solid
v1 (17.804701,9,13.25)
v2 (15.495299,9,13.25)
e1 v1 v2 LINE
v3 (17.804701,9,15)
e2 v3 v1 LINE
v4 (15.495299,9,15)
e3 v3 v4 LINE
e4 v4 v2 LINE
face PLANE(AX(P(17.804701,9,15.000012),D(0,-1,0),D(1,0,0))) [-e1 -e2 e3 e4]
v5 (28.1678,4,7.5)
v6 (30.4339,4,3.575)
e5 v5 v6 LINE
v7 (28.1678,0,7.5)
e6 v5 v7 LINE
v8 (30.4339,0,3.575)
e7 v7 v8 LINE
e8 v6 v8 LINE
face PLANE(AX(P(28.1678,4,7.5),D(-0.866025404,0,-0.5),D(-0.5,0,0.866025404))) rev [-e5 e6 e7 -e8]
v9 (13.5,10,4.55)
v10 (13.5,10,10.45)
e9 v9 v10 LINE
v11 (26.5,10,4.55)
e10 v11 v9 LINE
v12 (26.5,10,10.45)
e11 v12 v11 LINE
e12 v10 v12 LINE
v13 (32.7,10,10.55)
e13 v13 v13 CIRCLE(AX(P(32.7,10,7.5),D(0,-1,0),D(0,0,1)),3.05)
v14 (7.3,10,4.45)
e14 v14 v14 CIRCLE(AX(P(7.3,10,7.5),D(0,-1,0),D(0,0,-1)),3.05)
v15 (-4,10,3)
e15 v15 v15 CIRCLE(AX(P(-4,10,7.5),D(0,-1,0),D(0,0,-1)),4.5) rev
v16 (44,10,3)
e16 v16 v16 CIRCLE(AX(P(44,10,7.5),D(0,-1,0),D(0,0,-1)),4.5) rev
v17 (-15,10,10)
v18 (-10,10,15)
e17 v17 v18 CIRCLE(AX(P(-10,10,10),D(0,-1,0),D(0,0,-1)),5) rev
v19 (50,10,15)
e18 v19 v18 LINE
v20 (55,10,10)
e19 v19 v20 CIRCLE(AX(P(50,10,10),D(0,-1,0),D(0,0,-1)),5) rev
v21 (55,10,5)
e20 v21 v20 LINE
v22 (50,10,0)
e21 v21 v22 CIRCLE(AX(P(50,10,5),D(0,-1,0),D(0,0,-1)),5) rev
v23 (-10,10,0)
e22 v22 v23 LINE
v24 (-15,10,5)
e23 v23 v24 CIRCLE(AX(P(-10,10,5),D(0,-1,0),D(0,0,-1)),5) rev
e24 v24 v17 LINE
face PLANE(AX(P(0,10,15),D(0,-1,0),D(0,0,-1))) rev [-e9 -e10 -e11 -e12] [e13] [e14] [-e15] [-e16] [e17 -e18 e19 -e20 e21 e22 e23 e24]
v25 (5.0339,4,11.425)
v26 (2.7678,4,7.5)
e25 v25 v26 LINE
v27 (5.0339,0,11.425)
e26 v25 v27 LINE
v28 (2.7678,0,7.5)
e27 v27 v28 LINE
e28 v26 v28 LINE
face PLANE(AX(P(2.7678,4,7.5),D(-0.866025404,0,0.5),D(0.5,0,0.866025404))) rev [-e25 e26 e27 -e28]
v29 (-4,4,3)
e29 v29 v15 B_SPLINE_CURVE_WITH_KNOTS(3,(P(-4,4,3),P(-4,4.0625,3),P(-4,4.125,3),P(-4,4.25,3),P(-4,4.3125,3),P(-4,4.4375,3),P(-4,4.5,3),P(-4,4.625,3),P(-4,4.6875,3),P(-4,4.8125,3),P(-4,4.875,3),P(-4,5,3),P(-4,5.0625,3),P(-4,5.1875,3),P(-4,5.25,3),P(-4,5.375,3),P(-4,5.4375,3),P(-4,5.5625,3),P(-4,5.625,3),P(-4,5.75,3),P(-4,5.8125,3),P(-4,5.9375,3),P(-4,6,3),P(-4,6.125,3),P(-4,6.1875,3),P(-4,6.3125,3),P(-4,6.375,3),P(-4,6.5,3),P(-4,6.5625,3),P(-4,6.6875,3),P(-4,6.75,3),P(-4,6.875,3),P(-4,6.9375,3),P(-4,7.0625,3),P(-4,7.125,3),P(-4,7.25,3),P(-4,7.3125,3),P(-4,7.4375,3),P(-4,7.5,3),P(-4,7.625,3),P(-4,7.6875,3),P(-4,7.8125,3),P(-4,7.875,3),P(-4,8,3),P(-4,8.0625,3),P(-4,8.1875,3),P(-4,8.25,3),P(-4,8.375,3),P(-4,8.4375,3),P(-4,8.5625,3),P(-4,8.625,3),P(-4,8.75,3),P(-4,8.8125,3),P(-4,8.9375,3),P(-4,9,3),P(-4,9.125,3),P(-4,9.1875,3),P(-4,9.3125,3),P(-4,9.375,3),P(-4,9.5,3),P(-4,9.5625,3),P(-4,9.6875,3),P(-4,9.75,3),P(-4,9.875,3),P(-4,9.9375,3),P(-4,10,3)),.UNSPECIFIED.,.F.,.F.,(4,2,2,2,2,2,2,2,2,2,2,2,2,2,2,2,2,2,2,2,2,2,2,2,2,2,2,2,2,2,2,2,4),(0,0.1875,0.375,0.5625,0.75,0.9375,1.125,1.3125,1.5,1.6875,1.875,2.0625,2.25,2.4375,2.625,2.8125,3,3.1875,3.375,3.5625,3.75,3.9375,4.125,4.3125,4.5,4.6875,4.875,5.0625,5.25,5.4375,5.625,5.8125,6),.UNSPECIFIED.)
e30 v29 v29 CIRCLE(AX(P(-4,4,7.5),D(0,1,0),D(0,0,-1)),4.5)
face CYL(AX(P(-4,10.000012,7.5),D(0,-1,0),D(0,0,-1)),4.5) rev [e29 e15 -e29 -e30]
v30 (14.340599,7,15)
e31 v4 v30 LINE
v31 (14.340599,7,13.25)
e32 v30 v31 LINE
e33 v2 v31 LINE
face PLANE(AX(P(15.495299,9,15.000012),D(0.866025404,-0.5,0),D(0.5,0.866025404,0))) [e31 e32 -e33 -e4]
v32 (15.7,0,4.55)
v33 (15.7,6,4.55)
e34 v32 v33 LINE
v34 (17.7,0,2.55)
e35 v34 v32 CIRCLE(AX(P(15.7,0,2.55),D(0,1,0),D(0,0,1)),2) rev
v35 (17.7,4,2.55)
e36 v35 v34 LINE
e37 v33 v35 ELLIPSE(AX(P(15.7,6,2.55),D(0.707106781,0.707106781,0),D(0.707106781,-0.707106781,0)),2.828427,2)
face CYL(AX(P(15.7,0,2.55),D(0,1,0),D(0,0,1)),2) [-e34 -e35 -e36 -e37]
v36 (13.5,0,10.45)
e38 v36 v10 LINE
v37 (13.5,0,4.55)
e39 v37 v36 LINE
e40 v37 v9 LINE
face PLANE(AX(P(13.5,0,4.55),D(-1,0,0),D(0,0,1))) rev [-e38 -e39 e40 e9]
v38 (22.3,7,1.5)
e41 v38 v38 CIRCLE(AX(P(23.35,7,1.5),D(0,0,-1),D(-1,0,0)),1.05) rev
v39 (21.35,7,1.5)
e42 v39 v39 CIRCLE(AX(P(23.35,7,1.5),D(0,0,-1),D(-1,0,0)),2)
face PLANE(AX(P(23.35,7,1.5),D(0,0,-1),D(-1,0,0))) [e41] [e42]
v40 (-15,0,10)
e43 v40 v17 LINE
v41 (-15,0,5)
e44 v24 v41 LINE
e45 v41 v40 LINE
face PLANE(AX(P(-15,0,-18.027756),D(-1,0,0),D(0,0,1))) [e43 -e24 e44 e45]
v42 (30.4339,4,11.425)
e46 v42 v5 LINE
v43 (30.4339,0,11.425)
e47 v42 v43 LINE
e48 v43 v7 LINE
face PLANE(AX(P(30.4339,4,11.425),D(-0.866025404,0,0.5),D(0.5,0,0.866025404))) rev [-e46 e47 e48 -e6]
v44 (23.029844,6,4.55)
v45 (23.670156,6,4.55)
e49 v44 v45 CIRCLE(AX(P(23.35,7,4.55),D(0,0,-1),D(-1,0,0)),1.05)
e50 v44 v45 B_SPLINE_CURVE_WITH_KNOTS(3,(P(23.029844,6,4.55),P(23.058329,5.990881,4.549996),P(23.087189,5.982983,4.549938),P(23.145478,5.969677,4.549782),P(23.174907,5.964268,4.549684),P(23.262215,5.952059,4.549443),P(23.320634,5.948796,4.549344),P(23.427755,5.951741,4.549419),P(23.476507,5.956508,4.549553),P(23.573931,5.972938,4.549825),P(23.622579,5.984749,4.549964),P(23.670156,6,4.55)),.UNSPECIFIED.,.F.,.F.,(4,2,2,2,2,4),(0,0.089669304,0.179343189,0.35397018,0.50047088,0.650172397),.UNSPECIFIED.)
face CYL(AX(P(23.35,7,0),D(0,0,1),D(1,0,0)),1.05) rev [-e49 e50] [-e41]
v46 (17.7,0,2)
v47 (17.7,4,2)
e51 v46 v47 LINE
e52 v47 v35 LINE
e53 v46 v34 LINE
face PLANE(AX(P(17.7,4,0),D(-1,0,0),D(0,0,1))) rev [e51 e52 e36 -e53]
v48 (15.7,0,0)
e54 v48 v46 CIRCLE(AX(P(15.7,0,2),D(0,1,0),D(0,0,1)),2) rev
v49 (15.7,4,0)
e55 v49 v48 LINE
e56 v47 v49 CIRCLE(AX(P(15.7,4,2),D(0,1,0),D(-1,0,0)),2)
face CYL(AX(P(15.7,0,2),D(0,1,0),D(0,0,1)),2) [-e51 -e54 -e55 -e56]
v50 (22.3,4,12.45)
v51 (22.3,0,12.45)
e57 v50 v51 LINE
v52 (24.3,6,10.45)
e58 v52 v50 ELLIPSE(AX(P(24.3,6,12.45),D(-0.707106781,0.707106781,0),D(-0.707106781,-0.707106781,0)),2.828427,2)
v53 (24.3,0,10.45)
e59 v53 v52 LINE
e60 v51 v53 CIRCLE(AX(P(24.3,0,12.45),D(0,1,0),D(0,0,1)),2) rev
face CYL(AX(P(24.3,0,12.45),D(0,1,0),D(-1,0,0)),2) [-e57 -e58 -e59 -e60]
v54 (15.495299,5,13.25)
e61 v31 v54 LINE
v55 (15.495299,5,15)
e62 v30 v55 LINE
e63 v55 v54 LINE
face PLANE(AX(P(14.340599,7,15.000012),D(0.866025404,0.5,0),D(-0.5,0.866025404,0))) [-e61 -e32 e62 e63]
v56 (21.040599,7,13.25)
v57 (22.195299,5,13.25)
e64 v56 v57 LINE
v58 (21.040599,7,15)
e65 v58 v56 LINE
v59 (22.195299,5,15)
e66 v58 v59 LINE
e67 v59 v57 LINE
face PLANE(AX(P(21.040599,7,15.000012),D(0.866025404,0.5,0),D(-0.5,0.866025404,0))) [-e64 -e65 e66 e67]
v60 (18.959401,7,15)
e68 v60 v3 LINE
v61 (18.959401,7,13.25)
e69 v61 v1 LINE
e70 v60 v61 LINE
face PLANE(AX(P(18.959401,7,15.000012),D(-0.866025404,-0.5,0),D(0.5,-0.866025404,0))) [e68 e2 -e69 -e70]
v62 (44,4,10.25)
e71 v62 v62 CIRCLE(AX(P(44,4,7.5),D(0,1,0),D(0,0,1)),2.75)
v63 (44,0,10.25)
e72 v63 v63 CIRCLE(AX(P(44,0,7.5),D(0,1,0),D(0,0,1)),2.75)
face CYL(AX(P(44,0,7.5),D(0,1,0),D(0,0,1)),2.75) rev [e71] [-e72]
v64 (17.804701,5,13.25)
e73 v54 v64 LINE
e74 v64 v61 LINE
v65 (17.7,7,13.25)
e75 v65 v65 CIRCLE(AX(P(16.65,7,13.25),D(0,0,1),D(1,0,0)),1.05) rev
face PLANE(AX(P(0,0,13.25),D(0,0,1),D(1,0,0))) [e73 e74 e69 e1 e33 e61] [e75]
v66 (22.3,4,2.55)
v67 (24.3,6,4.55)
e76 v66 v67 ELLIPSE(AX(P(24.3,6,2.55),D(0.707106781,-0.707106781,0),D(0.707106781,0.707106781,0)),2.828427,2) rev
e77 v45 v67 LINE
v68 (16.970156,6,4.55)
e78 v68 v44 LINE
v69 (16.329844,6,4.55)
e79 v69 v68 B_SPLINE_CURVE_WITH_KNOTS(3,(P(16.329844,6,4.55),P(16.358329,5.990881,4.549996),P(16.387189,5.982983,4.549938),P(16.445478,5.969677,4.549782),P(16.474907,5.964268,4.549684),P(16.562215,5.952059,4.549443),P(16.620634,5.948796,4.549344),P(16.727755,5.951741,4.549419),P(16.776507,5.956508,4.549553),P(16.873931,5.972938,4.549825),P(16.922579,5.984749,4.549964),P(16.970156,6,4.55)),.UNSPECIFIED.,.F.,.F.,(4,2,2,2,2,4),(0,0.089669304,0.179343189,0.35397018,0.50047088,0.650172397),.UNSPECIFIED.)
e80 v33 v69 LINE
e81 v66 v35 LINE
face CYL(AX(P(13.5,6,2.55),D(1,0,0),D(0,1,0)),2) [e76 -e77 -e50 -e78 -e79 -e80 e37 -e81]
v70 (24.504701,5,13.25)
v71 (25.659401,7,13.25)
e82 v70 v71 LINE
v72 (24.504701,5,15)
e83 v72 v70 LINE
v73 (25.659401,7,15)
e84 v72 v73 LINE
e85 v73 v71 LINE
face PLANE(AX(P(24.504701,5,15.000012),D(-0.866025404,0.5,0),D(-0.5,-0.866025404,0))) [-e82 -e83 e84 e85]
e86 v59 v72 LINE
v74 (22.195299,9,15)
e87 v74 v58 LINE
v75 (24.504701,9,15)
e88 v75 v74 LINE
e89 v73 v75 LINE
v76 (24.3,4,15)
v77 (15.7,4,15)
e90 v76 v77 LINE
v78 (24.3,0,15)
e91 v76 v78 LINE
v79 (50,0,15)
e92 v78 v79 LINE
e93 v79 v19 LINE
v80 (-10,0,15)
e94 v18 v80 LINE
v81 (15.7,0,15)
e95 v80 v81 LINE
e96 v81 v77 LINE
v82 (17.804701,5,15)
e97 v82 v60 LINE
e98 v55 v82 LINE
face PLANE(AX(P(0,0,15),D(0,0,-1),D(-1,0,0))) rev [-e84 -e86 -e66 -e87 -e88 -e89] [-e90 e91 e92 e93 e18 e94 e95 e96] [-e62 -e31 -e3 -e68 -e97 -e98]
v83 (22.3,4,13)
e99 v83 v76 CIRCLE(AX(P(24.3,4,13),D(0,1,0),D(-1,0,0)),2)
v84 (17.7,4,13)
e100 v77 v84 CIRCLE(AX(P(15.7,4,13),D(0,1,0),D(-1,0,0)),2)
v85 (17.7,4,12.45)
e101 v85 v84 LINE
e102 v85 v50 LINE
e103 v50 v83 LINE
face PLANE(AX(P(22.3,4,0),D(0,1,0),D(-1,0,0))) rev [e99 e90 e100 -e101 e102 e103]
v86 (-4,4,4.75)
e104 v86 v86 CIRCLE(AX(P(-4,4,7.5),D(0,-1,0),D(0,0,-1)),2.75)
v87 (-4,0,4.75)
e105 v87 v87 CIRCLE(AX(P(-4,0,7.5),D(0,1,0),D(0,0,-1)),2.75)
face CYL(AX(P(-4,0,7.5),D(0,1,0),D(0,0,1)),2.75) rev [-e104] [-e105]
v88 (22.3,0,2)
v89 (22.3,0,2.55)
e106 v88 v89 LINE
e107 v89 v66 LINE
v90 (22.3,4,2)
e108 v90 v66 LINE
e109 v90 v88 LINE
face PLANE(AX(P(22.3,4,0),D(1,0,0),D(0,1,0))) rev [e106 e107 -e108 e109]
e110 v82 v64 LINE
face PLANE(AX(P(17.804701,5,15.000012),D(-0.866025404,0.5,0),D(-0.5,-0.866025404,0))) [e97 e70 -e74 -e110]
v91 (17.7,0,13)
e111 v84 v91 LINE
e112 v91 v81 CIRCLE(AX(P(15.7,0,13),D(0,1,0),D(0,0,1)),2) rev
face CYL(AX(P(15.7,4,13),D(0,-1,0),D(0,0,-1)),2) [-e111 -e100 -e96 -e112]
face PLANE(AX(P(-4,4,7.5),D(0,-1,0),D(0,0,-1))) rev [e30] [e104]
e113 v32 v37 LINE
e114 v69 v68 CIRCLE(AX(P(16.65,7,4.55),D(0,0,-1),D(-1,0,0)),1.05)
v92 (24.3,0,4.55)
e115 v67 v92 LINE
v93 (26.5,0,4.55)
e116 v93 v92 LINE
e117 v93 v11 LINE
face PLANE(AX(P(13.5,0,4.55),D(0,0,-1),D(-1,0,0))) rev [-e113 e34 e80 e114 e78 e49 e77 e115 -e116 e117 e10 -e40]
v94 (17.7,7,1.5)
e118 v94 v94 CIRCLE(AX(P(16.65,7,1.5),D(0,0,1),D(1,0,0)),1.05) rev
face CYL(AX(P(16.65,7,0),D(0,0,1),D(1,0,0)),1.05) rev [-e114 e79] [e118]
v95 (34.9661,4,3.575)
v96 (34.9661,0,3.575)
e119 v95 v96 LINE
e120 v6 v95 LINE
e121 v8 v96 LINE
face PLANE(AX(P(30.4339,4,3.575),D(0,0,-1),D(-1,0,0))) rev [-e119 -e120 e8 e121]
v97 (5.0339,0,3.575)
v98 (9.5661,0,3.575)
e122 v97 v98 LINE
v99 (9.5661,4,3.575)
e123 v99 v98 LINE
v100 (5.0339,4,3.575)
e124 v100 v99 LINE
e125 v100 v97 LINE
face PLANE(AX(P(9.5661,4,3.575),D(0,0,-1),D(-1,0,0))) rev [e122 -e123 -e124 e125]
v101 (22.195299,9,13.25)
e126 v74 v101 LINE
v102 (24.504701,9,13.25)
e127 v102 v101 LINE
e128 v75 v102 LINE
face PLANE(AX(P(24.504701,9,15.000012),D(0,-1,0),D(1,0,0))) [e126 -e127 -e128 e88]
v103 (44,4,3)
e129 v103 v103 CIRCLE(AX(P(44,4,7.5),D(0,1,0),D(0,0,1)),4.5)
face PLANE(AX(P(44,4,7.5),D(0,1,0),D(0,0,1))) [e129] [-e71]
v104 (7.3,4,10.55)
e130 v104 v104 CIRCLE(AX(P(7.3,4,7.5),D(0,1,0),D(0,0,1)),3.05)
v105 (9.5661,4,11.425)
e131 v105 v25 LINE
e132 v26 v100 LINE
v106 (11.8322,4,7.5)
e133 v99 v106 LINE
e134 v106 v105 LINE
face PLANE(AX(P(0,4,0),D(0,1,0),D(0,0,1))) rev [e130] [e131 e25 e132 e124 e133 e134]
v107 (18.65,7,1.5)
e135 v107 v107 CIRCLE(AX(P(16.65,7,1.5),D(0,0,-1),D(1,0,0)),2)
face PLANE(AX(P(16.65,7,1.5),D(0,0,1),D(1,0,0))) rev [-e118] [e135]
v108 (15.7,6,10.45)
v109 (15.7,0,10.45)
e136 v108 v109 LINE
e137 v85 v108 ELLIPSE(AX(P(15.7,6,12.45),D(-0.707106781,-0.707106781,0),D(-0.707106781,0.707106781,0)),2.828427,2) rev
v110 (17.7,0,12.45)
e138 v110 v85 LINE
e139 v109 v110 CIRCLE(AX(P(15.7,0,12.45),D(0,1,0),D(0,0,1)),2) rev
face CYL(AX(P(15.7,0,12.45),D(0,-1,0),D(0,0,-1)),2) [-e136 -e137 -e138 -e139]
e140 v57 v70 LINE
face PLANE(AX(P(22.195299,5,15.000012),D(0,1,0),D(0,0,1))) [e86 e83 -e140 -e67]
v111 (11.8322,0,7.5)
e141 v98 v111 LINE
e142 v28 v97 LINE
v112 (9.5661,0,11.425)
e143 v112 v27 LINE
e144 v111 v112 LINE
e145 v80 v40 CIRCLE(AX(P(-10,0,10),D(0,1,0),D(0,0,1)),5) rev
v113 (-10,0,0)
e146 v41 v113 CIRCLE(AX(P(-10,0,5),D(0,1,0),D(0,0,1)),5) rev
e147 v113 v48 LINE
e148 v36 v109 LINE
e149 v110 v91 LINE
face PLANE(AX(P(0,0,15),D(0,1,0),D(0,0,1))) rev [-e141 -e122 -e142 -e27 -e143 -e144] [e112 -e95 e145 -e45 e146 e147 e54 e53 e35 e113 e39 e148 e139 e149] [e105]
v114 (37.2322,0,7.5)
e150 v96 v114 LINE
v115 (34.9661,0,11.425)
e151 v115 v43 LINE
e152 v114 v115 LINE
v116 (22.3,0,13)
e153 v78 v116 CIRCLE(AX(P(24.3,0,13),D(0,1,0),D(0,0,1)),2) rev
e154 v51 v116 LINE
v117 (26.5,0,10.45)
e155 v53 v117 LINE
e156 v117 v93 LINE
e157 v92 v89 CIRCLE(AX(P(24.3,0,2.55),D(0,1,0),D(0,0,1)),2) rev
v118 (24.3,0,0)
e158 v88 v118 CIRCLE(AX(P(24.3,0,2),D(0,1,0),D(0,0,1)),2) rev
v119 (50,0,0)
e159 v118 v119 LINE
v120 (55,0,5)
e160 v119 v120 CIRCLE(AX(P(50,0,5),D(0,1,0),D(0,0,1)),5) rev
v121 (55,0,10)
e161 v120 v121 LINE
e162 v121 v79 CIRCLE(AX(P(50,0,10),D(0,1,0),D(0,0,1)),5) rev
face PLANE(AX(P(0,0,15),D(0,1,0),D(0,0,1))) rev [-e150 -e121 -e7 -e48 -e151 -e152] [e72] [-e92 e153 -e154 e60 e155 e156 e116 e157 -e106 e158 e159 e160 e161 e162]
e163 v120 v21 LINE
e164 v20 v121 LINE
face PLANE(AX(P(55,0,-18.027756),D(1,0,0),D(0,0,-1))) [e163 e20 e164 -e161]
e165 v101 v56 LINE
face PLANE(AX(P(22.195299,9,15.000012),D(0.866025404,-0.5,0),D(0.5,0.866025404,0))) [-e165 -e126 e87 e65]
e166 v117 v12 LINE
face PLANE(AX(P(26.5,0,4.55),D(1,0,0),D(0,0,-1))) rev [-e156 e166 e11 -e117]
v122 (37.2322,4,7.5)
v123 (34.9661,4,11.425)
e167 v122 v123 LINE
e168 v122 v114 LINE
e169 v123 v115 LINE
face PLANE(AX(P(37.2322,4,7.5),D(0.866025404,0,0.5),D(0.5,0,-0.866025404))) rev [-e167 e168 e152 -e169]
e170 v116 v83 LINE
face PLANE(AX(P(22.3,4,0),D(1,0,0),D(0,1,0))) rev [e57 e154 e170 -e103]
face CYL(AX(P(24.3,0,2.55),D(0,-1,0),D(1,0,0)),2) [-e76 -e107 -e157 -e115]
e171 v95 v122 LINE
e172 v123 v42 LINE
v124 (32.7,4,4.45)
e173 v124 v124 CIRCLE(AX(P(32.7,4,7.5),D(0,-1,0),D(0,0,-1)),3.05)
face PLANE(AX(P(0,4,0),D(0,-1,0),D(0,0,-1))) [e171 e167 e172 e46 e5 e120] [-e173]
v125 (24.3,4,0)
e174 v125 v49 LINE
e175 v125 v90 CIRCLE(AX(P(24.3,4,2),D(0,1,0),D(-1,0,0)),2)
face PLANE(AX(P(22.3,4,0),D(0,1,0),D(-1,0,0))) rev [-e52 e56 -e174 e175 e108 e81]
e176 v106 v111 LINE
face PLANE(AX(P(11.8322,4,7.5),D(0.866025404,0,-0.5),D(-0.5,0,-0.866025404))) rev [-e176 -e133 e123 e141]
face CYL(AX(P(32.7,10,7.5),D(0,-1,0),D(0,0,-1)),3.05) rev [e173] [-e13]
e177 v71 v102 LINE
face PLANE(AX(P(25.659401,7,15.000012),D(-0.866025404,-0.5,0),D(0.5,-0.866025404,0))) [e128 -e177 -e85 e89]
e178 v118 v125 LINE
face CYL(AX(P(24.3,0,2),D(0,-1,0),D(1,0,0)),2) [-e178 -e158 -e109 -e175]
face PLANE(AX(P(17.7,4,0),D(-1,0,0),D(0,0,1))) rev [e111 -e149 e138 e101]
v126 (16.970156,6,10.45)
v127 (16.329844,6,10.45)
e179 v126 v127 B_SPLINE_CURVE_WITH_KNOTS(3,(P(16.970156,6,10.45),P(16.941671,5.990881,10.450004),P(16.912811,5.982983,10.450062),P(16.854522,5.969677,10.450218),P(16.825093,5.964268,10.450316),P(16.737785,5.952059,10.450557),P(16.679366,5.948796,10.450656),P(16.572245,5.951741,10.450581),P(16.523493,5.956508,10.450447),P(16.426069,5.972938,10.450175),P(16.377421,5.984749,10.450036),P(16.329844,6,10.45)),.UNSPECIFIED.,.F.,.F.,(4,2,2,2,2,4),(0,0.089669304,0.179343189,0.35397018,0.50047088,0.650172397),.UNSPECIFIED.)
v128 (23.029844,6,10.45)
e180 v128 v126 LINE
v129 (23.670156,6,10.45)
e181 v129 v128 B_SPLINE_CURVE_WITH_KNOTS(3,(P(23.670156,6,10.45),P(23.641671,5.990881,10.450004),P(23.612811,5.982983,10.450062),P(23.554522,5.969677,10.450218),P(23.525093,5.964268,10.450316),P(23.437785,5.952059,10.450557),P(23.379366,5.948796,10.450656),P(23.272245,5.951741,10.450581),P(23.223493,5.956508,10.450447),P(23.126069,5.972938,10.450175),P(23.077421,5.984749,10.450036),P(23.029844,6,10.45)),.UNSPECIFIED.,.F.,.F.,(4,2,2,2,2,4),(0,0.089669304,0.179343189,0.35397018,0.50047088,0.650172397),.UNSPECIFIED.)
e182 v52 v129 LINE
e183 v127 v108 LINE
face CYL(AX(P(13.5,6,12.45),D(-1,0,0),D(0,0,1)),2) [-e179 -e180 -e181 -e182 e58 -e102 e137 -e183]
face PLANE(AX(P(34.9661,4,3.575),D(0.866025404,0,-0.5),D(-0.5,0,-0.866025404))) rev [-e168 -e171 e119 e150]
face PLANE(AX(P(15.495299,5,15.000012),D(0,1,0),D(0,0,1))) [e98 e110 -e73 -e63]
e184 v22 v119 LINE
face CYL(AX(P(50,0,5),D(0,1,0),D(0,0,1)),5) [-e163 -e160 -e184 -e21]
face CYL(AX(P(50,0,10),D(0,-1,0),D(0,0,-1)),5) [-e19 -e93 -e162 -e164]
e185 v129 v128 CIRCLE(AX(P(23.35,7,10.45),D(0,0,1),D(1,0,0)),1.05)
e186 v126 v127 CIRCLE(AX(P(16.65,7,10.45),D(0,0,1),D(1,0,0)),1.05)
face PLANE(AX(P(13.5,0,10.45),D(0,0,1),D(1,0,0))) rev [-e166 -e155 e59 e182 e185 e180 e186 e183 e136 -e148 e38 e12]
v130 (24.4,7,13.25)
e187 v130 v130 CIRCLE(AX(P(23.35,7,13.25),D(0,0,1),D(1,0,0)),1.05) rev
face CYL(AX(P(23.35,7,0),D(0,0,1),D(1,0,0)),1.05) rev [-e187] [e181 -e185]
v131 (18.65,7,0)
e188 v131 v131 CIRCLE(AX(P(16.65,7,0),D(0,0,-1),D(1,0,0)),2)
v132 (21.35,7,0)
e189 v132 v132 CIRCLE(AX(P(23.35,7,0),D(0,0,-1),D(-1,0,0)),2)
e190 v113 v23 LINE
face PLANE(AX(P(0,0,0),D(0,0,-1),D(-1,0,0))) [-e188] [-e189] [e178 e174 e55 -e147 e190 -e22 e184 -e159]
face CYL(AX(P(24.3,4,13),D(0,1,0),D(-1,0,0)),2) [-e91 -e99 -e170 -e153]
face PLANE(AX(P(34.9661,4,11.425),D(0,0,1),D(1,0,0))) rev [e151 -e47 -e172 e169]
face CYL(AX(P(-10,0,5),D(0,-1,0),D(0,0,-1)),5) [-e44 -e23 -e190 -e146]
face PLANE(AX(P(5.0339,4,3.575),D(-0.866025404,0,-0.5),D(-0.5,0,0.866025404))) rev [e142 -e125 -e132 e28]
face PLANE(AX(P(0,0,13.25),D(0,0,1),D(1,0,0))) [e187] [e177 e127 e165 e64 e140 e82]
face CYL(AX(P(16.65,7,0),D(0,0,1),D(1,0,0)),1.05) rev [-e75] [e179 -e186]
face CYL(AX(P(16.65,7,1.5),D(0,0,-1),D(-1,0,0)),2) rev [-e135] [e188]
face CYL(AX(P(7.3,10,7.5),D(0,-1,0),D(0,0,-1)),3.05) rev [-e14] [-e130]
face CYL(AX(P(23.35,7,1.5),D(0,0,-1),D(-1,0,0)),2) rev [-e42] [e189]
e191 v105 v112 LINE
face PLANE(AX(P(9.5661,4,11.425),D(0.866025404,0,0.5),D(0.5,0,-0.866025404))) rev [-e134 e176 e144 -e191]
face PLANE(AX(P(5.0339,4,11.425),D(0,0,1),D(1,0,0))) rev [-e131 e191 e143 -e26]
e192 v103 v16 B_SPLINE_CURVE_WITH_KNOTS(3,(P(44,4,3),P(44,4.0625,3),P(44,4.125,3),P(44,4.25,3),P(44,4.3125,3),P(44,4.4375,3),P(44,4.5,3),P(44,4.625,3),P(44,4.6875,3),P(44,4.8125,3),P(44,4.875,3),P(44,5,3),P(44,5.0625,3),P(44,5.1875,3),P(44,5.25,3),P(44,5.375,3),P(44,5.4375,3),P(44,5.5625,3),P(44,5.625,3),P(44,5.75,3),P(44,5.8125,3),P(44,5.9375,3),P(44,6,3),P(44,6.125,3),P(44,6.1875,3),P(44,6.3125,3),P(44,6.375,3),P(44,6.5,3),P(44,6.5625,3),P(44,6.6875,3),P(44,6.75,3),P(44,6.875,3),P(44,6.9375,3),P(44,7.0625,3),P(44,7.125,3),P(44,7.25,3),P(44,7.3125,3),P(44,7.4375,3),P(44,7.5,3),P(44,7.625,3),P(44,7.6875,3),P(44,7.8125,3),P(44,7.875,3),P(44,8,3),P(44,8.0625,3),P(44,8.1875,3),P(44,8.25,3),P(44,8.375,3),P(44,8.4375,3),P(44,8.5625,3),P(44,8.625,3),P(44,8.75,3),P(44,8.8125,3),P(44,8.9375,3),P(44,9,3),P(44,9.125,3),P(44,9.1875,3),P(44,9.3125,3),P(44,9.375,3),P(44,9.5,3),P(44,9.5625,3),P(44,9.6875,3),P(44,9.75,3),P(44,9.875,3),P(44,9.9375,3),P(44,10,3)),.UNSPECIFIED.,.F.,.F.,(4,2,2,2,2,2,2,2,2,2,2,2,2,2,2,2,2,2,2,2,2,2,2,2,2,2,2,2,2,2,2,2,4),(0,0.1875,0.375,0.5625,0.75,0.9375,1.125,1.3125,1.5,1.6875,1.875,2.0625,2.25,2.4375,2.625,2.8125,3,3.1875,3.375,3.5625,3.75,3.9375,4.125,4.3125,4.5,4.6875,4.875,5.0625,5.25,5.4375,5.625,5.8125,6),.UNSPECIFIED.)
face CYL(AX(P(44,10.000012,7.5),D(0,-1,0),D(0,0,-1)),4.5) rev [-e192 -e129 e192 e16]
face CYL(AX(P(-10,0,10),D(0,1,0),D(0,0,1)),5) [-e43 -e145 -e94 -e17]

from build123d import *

# Parameters (mm, degrees)
SKETCH1_W                = 40
SKETCH1_H                = 10
SWITCHCASE_DEPTH         = 15
SKETCH2_W                = 13
SKETCH2_H                = 5.9
SWITCHCAVITY_DEPTH       = 44.874821937
SWITCHM2HOLES_DEPTH      = 43.534721111
SWITCHM2HOLES_DEPTH_BACK = 43.534721111
SKETCH3_R                = 1.05
SKETCH14_R               = 2
M2HEAD_DEPTH             = 1.5
M2NUTINSERTS_DEPTH       = 44.874821937
M2NUTINSERTS_DEPTH_BACK  = 1.75
SKETCH7_W                = 15
SKETCH7_H                = 10
WINGS_DEPTH              = 15
M5NUTS_DEPTH             = 4
SKETCH10_R               = 3.05
M6HOLE_DEPTH             = 58.879184514
WIRECHANNEL_DEPTH        = 57.870049235
WIRECHANNEL_DEPTH_BACK   = 57.870049235
SKETCH11_W               = 4.6
SKETCH11_H               = 4
CHANNELFILLET_R          = 2
M5HEAD_DEPTH             = 58.879184514
M5HEAD_DEPTH_BACK        = 6
SKETCH12_R               = 4.5
SKETCH13_R               = 2.75
M5THREAD_DEPTH           = 58.879184514
ENDFILLET_R              = 5


with BuildPart() as part:
    # Sketch1 → SwitchCase (new body)
    with BuildSketch(Plane.XY):
        with Locations((20, 5)):
            Rectangle(SKETCH1_W, SKETCH1_H)
    extrude(amount=SWITCHCASE_DEPTH)

    # Sketch2 → SwitchCavity (cut, through all)
    with BuildSketch(Plane(origin=(0, 10, 0), x_dir=(1, 0, 0), z_dir=(0, 1, 0))):
        with Locations((20, -7.5)):
            Rectangle(SKETCH2_W, SKETCH2_H)
    extrude(amount=-SWITCHCAVITY_DEPTH, mode=Mode.SUBTRACT)

    # Sketch3 → SwitchM2Holes (cut, two sides: drawn at the far end of the back side and taken through both)
    with BuildSketch(Plane.XY.offset(4.55).offset(-SWITCHM2HOLES_DEPTH_BACK)):
        with Locations((16.65, 7)):
            Circle(SKETCH3_R)
        with Locations((23.35, 7)):
            Circle(SKETCH3_R)
    extrude(amount=SWITCHM2HOLES_DEPTH + SWITCHM2HOLES_DEPTH_BACK, mode=Mode.SUBTRACT)

    # Sketch14 → M2Head (cut)
    with BuildSketch(Plane(origin=(0, 0, 0), x_dir=(-1, 0, 0), z_dir=(0, 0, -1))):
        with Locations((-23.35, 7)):
            Circle(SKETCH14_R)
        with Locations(Location((-16.65, 7, 0), (0, 0, 180))):
            Circle(SKETCH14_R)
    extrude(amount=-M2HEAD_DEPTH, mode=Mode.SUBTRACT)

    # Sketch5 → M2NutInserts (cut, two sides: drawn at the far end of the back side and taken through both)
    with BuildSketch(Plane.XY.offset(15).offset(-M2NUTINSERTS_DEPTH_BACK)):
        Polygon((18.959401077, 7), (17.804700538, 9), (15.495299462, 9), (14.340598923, 7), (15.495299462, 5), (17.804700538, 5), align=None)
        Polygon((25.659401077, 7), (24.504700538, 9), (22.195299462, 9), (21.040598923, 7), (22.195299462, 5), (24.504700538, 5), align=None)
    extrude(amount=M2NUTINSERTS_DEPTH + M2NUTINSERTS_DEPTH_BACK, mode=Mode.SUBTRACT)

    # Sketch7 → Wings (add)
    with BuildSketch(Plane.XY.offset(15)):
        with Locations((-7.5, 5)):
            Rectangle(SKETCH7_W, SKETCH7_H)
        with Locations((47.5, 5)):
            Rectangle(SKETCH7_W, SKETCH7_H)
    extrude(amount=-WINGS_DEPTH)

    # Sketch9 → M5Nuts (cut)
    with BuildSketch(Plane.XZ):
        Polygon((37.232199613, 7.5), (34.966099807, 11.425), (30.433900193, 11.425), (28.167800387, 7.5), (30.433900193, 3.575), (34.966099807, 3.575), align=None)
        Polygon((5.033900193, 3.575), (2.767800387, 7.5), (5.033900193, 11.425), (9.566099807, 11.425), (11.832199613, 7.5), (9.566099807, 3.575), align=None)
    extrude(amount=-M5NUTS_DEPTH, mode=Mode.SUBTRACT)

    # Sketch10 → M6Hole (cut, through all)
    with BuildSketch(Plane.XZ):
        with Locations(Location((7.3, 7.5, 0), (0, 0, 270))):
            Circle(SKETCH10_R)
        with Locations(Location((32.7, 7.5, 0), (0, 0, 270))):
            Circle(SKETCH10_R)
    extrude(amount=-M6HOLE_DEPTH, mode=Mode.SUBTRACT)

    # Sketch11 → WireChannel (cut, two sides: drawn at the far end of the back side and taken through both)
    with BuildSketch(Plane.XY.offset(4.55).offset(-WIRECHANNEL_DEPTH_BACK)):
        with Locations((20, 2)):
            Rectangle(SKETCH11_W, SKETCH11_H)
    extrude(amount=WIRECHANNEL_DEPTH + WIRECHANNEL_DEPTH_BACK, mode=Mode.SUBTRACT)

    # ChannelFillet
    # the kernel refuses this fillet: 2 mm, written as the material it takes off along each edge
    with BuildSketch(Plane(origin=(22.3, 4, 10.45), x_dir=(0, 1, 0), z_dir=(-1, 0, 0)), Plane(origin=(17.7, 4, 4.55), x_dir=(0, 1, 0), z_dir=(1, 0, 0))) as channelfillet_piece_1:
        with BuildLine():
            CenterArc((CHANNELFILLET_R, -CHANNELFILLET_R), CHANNELFILLET_R, 90, 90)
            Line((0, -CHANNELFILLET_R), (-CHANNELFILLET_R * 0.02, -CHANNELFILLET_R))
            Line((-CHANNELFILLET_R * 0.02, -CHANNELFILLET_R), (-CHANNELFILLET_R * 0.02, CHANNELFILLET_R * 0.02))
            Line((-CHANNELFILLET_R * 0.02, CHANNELFILLET_R * 0.02), (CHANNELFILLET_R, CHANNELFILLET_R * 0.02))
            Line((CHANNELFILLET_R, CHANNELFILLET_R * 0.02), (CHANNELFILLET_R, 0))
        make_face()
    extrude(amount=4.6, mode=Mode.SUBTRACT)
    with BuildSketch(Plane(origin=(17.7, 4, 10.45), x_dir=(-1, 0, 0), z_dir=(0, -1, 0)), Plane(origin=(22.3, 0, 10.45), x_dir=(1, 0, 0), z_dir=(0, 1, 0)), Plane(origin=(22.3, 4, 4.55), x_dir=(1, 0, 0), z_dir=(0, -1, 0)), Plane(origin=(22.3, 4, 15), x_dir=(1, 0, 0), z_dir=(0, -1, 0))) as channelfillet_piece_2:
        with BuildLine():
            CenterArc((CHANNELFILLET_R, -CHANNELFILLET_R), CHANNELFILLET_R, 90, 90)
            Line((0, -CHANNELFILLET_R), (-CHANNELFILLET_R * 0.02, -CHANNELFILLET_R))
            Line((-CHANNELFILLET_R * 0.02, -CHANNELFILLET_R), (-CHANNELFILLET_R * 0.02, CHANNELFILLET_R * 0.02))
            Line((-CHANNELFILLET_R * 0.02, CHANNELFILLET_R * 0.02), (CHANNELFILLET_R, CHANNELFILLET_R * 0.02))
            Line((CHANNELFILLET_R, CHANNELFILLET_R * 0.02), (CHANNELFILLET_R, 0))
        make_face()
    extrude(amount=4, mode=Mode.SUBTRACT)
    with BuildSketch(Plane(origin=(22.3, 4, 0), x_dir=(1, 0, 0), z_dir=(0, -1, 0)), Plane(origin=(17.7, 0, 4.55), x_dir=(0, 0, -1), z_dir=(0, 1, 0)), Plane(origin=(17.7, 0, 0), x_dir=(-1, 0, 0), z_dir=(0, 1, 0)), Plane(origin=(17.7, 0, 15), x_dir=(0, 0, -1), z_dir=(0, 1, 0))) as channelfillet_piece_3:
        with BuildLine():
            CenterArc((CHANNELFILLET_R, CHANNELFILLET_R), CHANNELFILLET_R, 180, 90)
            Line((0, CHANNELFILLET_R), (-CHANNELFILLET_R * 0.02, CHANNELFILLET_R))
            Line((-CHANNELFILLET_R * 0.02, CHANNELFILLET_R), (-CHANNELFILLET_R * 0.02, -CHANNELFILLET_R * 0.02))
            Line((-CHANNELFILLET_R * 0.02, -CHANNELFILLET_R * 0.02), (CHANNELFILLET_R, -CHANNELFILLET_R * 0.02))
            Line((CHANNELFILLET_R, -CHANNELFILLET_R * 0.02), (CHANNELFILLET_R, 0))
        make_face()
    extrude(amount=4, mode=Mode.SUBTRACT)
    with BuildSketch(Plane(origin=(27.3, 4, 10.45), x_dir=(0, 1, 0), z_dir=(-1, 0, 0))) as channelfillet_piece_4a_section:
        with BuildLine():
            CenterArc((CHANNELFILLET_R, -CHANNELFILLET_R), CHANNELFILLET_R, 90, 90)
            Line((0, -CHANNELFILLET_R), (-CHANNELFILLET_R * 0.02, -CHANNELFILLET_R))
            Line((-CHANNELFILLET_R * 0.02, -CHANNELFILLET_R), (-CHANNELFILLET_R * 0.02, CHANNELFILLET_R * 0.02))
            Line((-CHANNELFILLET_R * 0.02, CHANNELFILLET_R * 0.02), (CHANNELFILLET_R, CHANNELFILLET_R * 0.02))
            Line((CHANNELFILLET_R, CHANNELFILLET_R * 0.02), (CHANNELFILLET_R, 0))
        make_face()
    channelfillet_piece_4a = extrude(amount=9.6, mode=Mode.PRIVATE)
    channelfillet_piece_4a = split(channelfillet_piece_4a, bisect_by=Plane(origin=(22.3, 4.452790229, 10.902790229), z_dir=(1, 0, 0)), keep=Keep.TOP, mode=Mode.PRIVATE)
    with BuildSketch(Plane(origin=(22.3, 0, 10.45), x_dir=(1, 0, 0), z_dir=(0, 1, 0))) as channelfillet_piece_4b_section:
        with BuildLine():
            CenterArc((CHANNELFILLET_R, -CHANNELFILLET_R), CHANNELFILLET_R, 90, 90)
            Line((0, -CHANNELFILLET_R), (-CHANNELFILLET_R * 0.02, -CHANNELFILLET_R))
            Line((-CHANNELFILLET_R * 0.02, -CHANNELFILLET_R), (-CHANNELFILLET_R * 0.02, CHANNELFILLET_R * 0.02))
            Line((-CHANNELFILLET_R * 0.02, CHANNELFILLET_R * 0.02), (CHANNELFILLET_R, CHANNELFILLET_R * 0.02))
            Line((CHANNELFILLET_R, CHANNELFILLET_R * 0.02), (CHANNELFILLET_R, 0))
        make_face()
    channelfillet_piece_4b = extrude(amount=9, mode=Mode.PRIVATE)
    channelfillet_piece_4b = split(channelfillet_piece_4b, bisect_by=Plane(origin=(22.752790229, 4, 10.902790229), z_dir=(0, 1, 0)), keep=Keep.TOP, mode=Mode.PRIVATE)
    channelfillet_piece_4 = channelfillet_piece_4a & channelfillet_piece_4b
    add(channelfillet_piece_4, mode=Mode.SUBTRACT)
    with BuildSketch(Plane(origin=(17.7, 9, 10.45), x_dir=(-1, 0, 0), z_dir=(0, -1, 0))) as channelfillet_piece_5a_section:
        with BuildLine():
            CenterArc((CHANNELFILLET_R, -CHANNELFILLET_R), CHANNELFILLET_R, 90, 90)
            Line((0, -CHANNELFILLET_R), (-CHANNELFILLET_R * 0.02, -CHANNELFILLET_R))
            Line((-CHANNELFILLET_R * 0.02, -CHANNELFILLET_R), (-CHANNELFILLET_R * 0.02, CHANNELFILLET_R * 0.02))
            Line((-CHANNELFILLET_R * 0.02, CHANNELFILLET_R * 0.02), (CHANNELFILLET_R, CHANNELFILLET_R * 0.02))
            Line((CHANNELFILLET_R, CHANNELFILLET_R * 0.02), (CHANNELFILLET_R, 0))
        make_face()
    channelfillet_piece_5a = extrude(amount=9, mode=Mode.PRIVATE)
    channelfillet_piece_5a = split(channelfillet_piece_5a, bisect_by=Plane(origin=(17.247209771, 4, 10.902790229), z_dir=(0, 1, 0)), keep=Keep.TOP, mode=Mode.PRIVATE)
    with BuildSketch(Plane(origin=(22.3, 4, 10.45), x_dir=(0, 1, 0), z_dir=(-1, 0, 0))) as channelfillet_piece_5b_section:
        with BuildLine():
            CenterArc((CHANNELFILLET_R, -CHANNELFILLET_R), CHANNELFILLET_R, 90, 90)
            Line((0, -CHANNELFILLET_R), (-CHANNELFILLET_R * 0.02, -CHANNELFILLET_R))
            Line((-CHANNELFILLET_R * 0.02, -CHANNELFILLET_R), (-CHANNELFILLET_R * 0.02, CHANNELFILLET_R * 0.02))
            Line((-CHANNELFILLET_R * 0.02, CHANNELFILLET_R * 0.02), (CHANNELFILLET_R, CHANNELFILLET_R * 0.02))
            Line((CHANNELFILLET_R, CHANNELFILLET_R * 0.02), (CHANNELFILLET_R, 0))
        make_face()
    channelfillet_piece_5b = extrude(amount=9.6, mode=Mode.PRIVATE)
    channelfillet_piece_5b = split(channelfillet_piece_5b, bisect_by=Plane(origin=(17.7, 4.452790229, 10.902790229), z_dir=(-1, 0, 0)), keep=Keep.TOP, mode=Mode.PRIVATE)
    channelfillet_piece_5 = channelfillet_piece_5a & channelfillet_piece_5b
    add(channelfillet_piece_5, mode=Mode.SUBTRACT)
    with BuildSketch(Plane(origin=(22.3, 9, 4.55), x_dir=(1, 0, 0), z_dir=(0, -1, 0))) as channelfillet_piece_6a_section:
        with BuildLine():
            CenterArc((CHANNELFILLET_R, -CHANNELFILLET_R), CHANNELFILLET_R, 90, 90)
            Line((0, -CHANNELFILLET_R), (-CHANNELFILLET_R * 0.02, -CHANNELFILLET_R))
            Line((-CHANNELFILLET_R * 0.02, -CHANNELFILLET_R), (-CHANNELFILLET_R * 0.02, CHANNELFILLET_R * 0.02))
            Line((-CHANNELFILLET_R * 0.02, CHANNELFILLET_R * 0.02), (CHANNELFILLET_R, CHANNELFILLET_R * 0.02))
            Line((CHANNELFILLET_R, CHANNELFILLET_R * 0.02), (CHANNELFILLET_R, 0))
        make_face()
    channelfillet_piece_6a = extrude(amount=9, mode=Mode.PRIVATE)
    channelfillet_piece_6a = split(channelfillet_piece_6a, bisect_by=Plane(origin=(22.752790229, 4, 4.097209771), z_dir=(0, 1, 0)), keep=Keep.TOP, mode=Mode.PRIVATE)
    with BuildSketch(Plane(origin=(17.7, 4, 4.55), x_dir=(0, 1, 0), z_dir=(1, 0, 0))) as channelfillet_piece_6b_section:
        with BuildLine():
            CenterArc((CHANNELFILLET_R, -CHANNELFILLET_R), CHANNELFILLET_R, 90, 90)
            Line((0, -CHANNELFILLET_R), (-CHANNELFILLET_R * 0.02, -CHANNELFILLET_R))
            Line((-CHANNELFILLET_R * 0.02, -CHANNELFILLET_R), (-CHANNELFILLET_R * 0.02, CHANNELFILLET_R * 0.02))
            Line((-CHANNELFILLET_R * 0.02, CHANNELFILLET_R * 0.02), (CHANNELFILLET_R, CHANNELFILLET_R * 0.02))
            Line((CHANNELFILLET_R, CHANNELFILLET_R * 0.02), (CHANNELFILLET_R, 0))
        make_face()
    channelfillet_piece_6b = extrude(amount=9.6, mode=Mode.PRIVATE)
    channelfillet_piece_6b = split(channelfillet_piece_6b, bisect_by=Plane(origin=(22.3, 4.452790229, 4.097209771), z_dir=(1, 0, 0)), keep=Keep.TOP, mode=Mode.PRIVATE)
    channelfillet_piece_6 = channelfillet_piece_6a & channelfillet_piece_6b
    add(channelfillet_piece_6, mode=Mode.SUBTRACT)
    with BuildSketch(Plane(origin=(17.7, 0, 4.55), x_dir=(0, 0, -1), z_dir=(0, 1, 0))) as channelfillet_piece_7a_section:
        with BuildLine():
            CenterArc((CHANNELFILLET_R, CHANNELFILLET_R), CHANNELFILLET_R, 180, 90)
            Line((0, CHANNELFILLET_R), (-CHANNELFILLET_R * 0.02, CHANNELFILLET_R))
            Line((-CHANNELFILLET_R * 0.02, CHANNELFILLET_R), (-CHANNELFILLET_R * 0.02, -CHANNELFILLET_R * 0.02))
            Line((-CHANNELFILLET_R * 0.02, -CHANNELFILLET_R * 0.02), (CHANNELFILLET_R, -CHANNELFILLET_R * 0.02))
            Line((CHANNELFILLET_R, -CHANNELFILLET_R * 0.02), (CHANNELFILLET_R, 0))
        make_face()
    channelfillet_piece_7a = extrude(amount=9, mode=Mode.PRIVATE)
    channelfillet_piece_7a = split(channelfillet_piece_7a, bisect_by=Plane(origin=(17.247209771, 4, 4.097209771), z_dir=(0, 1, 0)), keep=Keep.TOP, mode=Mode.PRIVATE)
    with BuildSketch(Plane(origin=(12.7, 4, 4.55), x_dir=(0, 1, 0), z_dir=(1, 0, 0))) as channelfillet_piece_7b_section:
        with BuildLine():
            CenterArc((CHANNELFILLET_R, -CHANNELFILLET_R), CHANNELFILLET_R, 90, 90)
            Line((0, -CHANNELFILLET_R), (-CHANNELFILLET_R * 0.02, -CHANNELFILLET_R))
            Line((-CHANNELFILLET_R * 0.02, -CHANNELFILLET_R), (-CHANNELFILLET_R * 0.02, CHANNELFILLET_R * 0.02))
            Line((-CHANNELFILLET_R * 0.02, CHANNELFILLET_R * 0.02), (CHANNELFILLET_R, CHANNELFILLET_R * 0.02))
            Line((CHANNELFILLET_R, CHANNELFILLET_R * 0.02), (CHANNELFILLET_R, 0))
        make_face()
    channelfillet_piece_7b = extrude(amount=9.6, mode=Mode.PRIVATE)
    channelfillet_piece_7b = split(channelfillet_piece_7b, bisect_by=Plane(origin=(17.7, 4.452790229, 4.097209771), z_dir=(-1, 0, 0)), keep=Keep.TOP, mode=Mode.PRIVATE)
    channelfillet_piece_7 = channelfillet_piece_7a & channelfillet_piece_7b
    add(channelfillet_piece_7, mode=Mode.SUBTRACT)

    # Sketch12 → M5Head (cut, two sides: drawn at the far end of the back side and taken through both)
    with BuildSketch(Plane(origin=(0, 10, 0), x_dir=(1, 0, 0), z_dir=(0, 1, 0)).offset(-M5HEAD_DEPTH_BACK)):
        with Locations(Location((44, -7.5, 0), (0, 0, 90))):
            Circle(SKETCH12_R)
        with Locations(Location((-4, -7.5, 0), (0, 0, 90))):
            Circle(SKETCH12_R)
    extrude(amount=M5HEAD_DEPTH + M5HEAD_DEPTH_BACK, mode=Mode.SUBTRACT)

    # Sketch13 → M5Thread (cut, through all)
    with BuildSketch(Plane(origin=(0, 10, 0), x_dir=(1, 0, 0), z_dir=(0, 1, 0))):
        with Locations(Location((44, -7.5, 0), (0, 0, 270))):
            Circle(SKETCH13_R)
        with Locations(Location((-4, -7.5, 0), (0, 0, 90))):
            Circle(SKETCH13_R)
    extrude(amount=-M5THREAD_DEPTH, mode=Mode.SUBTRACT)

    # EndFillet
    endfillet_edges = [part.edges().sort_by_distance(p)[0] for p in [
        (-15, 5, 15),
        (-15, 5, 0),
        (55, 5, 15),
        (55, 5, 0),
    ]]
    fillet(endfillet_edges, radius=ENDFILLET_R)


solid = part.part
